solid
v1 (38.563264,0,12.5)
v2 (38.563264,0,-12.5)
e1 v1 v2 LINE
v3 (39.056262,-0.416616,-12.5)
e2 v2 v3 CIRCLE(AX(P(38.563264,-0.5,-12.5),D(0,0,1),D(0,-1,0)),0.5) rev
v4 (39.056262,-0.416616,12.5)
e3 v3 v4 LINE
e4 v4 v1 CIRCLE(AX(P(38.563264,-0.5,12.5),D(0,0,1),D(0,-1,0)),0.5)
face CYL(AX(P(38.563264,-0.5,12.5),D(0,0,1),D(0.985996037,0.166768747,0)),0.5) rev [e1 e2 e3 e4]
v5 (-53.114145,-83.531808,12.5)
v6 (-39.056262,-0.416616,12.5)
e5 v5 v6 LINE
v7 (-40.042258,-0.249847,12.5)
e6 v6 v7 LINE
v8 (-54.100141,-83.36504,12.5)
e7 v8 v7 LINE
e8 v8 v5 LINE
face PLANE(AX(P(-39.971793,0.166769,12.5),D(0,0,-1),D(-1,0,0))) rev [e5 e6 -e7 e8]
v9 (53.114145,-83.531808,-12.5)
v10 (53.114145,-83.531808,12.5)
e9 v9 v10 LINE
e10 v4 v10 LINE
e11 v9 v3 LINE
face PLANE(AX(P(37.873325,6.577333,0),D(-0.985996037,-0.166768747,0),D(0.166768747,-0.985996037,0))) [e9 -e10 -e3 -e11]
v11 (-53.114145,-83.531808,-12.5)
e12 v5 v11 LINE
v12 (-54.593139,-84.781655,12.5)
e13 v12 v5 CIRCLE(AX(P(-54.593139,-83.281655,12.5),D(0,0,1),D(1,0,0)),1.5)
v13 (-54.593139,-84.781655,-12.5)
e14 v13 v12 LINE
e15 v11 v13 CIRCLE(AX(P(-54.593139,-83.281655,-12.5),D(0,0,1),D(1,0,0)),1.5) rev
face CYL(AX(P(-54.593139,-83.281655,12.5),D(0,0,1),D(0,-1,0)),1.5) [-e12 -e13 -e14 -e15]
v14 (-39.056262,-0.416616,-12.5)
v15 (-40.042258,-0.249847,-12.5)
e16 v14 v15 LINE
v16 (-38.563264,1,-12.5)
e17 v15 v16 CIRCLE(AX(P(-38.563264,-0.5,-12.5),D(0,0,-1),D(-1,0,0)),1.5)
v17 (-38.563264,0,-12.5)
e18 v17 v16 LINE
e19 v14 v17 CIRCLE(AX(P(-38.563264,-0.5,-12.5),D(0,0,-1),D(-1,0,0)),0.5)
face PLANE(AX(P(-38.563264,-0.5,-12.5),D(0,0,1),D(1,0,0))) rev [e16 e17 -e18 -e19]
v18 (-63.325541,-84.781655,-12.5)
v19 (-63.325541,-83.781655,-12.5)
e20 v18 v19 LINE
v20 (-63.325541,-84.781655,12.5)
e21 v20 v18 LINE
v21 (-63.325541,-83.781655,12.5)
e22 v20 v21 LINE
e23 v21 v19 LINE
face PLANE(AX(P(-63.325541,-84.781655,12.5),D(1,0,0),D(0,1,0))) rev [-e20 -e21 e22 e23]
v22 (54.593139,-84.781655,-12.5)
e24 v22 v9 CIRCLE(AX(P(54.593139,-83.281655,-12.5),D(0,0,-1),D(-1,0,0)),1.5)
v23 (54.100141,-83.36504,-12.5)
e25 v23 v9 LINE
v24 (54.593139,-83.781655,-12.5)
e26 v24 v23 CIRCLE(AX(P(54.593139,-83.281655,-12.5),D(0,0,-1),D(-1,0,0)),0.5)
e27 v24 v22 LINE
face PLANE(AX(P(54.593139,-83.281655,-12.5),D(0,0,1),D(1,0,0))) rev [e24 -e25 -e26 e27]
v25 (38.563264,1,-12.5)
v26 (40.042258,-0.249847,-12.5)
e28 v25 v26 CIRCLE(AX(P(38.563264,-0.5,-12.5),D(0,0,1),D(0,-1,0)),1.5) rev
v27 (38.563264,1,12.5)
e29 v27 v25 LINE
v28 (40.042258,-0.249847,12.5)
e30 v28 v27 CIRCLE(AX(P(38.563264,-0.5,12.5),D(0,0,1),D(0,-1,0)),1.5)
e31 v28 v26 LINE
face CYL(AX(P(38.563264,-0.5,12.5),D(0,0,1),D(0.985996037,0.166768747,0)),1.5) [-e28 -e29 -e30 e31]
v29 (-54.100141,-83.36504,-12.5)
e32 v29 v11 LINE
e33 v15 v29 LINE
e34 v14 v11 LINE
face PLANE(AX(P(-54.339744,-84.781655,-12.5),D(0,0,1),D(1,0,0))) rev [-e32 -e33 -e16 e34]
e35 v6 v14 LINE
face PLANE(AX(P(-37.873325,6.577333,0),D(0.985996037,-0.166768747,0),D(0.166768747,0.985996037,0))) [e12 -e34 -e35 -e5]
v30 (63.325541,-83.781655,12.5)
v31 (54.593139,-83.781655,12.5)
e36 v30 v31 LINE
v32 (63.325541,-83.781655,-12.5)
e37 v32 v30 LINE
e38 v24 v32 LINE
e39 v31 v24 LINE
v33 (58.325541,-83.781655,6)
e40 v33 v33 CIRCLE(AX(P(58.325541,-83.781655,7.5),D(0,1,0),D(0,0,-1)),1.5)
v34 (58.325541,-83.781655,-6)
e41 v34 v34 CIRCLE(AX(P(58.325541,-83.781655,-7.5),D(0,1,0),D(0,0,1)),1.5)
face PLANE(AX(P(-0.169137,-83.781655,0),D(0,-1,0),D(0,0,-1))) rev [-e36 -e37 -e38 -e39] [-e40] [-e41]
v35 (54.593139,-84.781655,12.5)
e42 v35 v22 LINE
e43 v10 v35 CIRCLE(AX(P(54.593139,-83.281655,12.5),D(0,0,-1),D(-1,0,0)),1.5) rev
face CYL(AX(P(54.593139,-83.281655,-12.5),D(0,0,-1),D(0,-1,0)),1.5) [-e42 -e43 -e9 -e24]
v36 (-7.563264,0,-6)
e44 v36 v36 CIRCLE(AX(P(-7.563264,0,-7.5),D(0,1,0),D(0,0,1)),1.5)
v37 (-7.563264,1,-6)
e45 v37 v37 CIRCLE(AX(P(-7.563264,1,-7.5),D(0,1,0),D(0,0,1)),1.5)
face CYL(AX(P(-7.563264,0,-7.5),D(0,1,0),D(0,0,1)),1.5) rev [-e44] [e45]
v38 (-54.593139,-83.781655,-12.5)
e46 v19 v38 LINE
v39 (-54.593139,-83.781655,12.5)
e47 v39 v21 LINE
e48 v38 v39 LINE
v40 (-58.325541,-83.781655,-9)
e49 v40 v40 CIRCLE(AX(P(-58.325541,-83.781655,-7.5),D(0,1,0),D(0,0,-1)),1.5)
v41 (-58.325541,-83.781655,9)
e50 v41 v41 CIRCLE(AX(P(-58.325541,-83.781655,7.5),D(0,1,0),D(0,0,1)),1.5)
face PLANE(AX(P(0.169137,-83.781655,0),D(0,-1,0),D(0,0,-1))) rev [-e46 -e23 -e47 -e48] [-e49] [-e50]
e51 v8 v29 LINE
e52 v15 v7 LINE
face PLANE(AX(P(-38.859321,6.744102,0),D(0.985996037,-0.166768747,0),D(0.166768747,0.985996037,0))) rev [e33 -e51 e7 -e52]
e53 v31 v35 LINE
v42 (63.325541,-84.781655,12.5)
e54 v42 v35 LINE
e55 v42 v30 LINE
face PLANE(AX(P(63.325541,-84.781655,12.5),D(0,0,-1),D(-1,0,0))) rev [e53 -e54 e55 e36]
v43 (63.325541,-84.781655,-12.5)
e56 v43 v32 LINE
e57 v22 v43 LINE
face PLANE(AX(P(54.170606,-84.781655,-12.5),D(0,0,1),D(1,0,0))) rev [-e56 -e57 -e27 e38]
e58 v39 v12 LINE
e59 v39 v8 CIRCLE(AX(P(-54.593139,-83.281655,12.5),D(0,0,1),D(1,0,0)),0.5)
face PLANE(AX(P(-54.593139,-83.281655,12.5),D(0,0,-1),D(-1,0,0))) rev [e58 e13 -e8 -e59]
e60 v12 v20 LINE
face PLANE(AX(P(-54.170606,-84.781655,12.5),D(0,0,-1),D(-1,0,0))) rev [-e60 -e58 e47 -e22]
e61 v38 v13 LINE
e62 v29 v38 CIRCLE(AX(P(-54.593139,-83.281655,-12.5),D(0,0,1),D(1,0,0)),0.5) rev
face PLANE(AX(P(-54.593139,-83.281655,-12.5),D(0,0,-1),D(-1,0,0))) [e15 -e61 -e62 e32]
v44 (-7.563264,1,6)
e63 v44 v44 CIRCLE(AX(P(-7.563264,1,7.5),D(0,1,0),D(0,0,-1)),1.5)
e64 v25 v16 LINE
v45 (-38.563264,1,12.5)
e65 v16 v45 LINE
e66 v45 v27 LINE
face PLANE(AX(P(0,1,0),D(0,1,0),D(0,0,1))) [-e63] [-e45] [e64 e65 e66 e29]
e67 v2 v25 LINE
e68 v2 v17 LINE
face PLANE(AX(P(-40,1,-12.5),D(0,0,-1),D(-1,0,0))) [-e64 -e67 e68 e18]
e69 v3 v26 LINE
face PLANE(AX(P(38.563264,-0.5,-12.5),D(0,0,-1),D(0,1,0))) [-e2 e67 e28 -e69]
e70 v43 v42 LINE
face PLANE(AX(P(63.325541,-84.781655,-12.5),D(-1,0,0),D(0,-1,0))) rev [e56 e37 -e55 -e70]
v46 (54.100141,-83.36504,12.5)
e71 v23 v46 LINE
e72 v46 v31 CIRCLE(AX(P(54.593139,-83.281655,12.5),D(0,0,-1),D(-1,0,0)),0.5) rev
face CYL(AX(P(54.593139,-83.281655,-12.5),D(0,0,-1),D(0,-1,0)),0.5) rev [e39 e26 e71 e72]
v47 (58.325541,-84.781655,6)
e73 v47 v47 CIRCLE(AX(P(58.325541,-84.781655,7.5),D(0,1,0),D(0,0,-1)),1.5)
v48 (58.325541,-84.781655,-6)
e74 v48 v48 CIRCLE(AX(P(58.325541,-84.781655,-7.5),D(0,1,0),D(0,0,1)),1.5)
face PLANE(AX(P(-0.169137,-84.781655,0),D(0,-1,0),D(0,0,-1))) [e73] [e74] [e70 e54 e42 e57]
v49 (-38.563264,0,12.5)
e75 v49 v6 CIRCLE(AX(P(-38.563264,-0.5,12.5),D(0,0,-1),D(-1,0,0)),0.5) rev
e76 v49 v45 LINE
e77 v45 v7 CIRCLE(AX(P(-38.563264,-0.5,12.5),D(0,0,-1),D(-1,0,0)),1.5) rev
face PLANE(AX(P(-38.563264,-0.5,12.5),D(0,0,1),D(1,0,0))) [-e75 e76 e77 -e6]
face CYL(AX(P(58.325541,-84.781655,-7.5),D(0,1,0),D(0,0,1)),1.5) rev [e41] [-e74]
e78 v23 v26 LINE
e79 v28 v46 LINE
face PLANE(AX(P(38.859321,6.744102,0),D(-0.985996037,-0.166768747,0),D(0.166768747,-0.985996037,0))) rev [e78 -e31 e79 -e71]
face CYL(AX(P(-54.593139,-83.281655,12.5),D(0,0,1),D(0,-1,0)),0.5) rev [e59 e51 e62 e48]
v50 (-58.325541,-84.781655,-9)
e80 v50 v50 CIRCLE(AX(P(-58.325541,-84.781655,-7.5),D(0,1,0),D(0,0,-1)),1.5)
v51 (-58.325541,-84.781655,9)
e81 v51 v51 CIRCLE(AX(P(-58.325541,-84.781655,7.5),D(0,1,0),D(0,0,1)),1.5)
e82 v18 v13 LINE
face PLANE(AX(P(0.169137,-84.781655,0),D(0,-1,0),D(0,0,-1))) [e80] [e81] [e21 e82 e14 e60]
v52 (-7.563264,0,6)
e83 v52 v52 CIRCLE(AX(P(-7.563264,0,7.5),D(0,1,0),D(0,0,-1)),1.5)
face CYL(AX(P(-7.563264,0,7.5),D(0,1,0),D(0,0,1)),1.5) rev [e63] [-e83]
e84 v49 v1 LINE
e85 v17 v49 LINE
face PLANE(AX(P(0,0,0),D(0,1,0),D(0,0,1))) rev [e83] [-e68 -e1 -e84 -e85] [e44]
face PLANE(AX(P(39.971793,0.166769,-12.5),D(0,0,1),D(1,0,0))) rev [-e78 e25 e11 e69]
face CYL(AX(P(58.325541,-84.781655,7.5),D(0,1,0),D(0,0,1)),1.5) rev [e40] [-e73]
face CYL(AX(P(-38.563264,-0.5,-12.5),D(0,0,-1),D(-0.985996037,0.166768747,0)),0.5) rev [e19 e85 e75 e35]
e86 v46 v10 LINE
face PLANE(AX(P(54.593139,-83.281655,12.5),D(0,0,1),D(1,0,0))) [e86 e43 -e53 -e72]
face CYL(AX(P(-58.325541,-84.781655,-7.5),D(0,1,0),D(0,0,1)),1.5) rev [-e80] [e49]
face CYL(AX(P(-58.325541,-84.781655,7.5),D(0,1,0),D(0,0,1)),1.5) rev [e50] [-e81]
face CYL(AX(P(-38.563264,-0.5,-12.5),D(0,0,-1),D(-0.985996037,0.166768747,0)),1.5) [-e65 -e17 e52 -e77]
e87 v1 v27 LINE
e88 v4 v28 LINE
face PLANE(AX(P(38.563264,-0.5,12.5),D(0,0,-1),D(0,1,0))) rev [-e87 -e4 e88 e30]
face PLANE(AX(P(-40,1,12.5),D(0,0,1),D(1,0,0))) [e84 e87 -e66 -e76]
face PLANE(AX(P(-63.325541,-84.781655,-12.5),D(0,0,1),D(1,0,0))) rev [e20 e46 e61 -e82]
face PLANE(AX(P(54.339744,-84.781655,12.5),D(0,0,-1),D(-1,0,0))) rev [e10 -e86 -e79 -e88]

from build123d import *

# Parameters (mm, degrees)
SKETCH_1_W               = 80
SKETCH_1_H               = 25
EXTRUDE_1_DEPTH          = 1
SM_START                 = -12.5
SM_EDGE_FLANGE_1_DEPTH   = 25
SM_EDGE_FLANGE_1_2_DEPTH = 25
SM_EDGE_FLANGE_2_DEPTH   = 25
SM_EDGE_FLANGE_2_2_DEPTH = 25
SKETCH_18_R              = 1.5
CUT_EXTRUDE_1_DEPTH      = 1
SKETCH_19_R              = 1.5
CUT_EXTRUDE_2_DEPTH      = 1


# Read off the part's stored shape, not the designer's step: Ребро-кромка1, Ребро-кромка2
with BuildPart() as part:
    # Sketch 1 → Бобышка-Вытянуть1 (new body)
    with BuildSketch(Plane(origin=(0, 0, 0), x_dir=(1, 0, 0), z_dir=(0, 1, 0))):
        Rectangle(SKETCH_1_W, SKETCH_1_H)
    extrude(amount=EXTRUDE_1_DEPTH)

    # Ребро-кромка1 outline → Ребро-кромка1 (cut)
    with BuildSketch(Plane.XY.offset(SM_START)):
        with BuildLine():
            Line((-40, 0), (-39.977477944, 0))
            ThreePointArc((-39.977477944, 0), (-39.429289785, 0.724744872), (-38.563264381, 1))
            Line((-38.563264381, 1), (-40, 1))
            Line((-40, 1), (-40, 0))
        make_face()
        with BuildLine():
            Line((40, 1), (38.563264381, 1))
            ThreePointArc((38.563264381, 1), (39.429289785, 0.724744872), (39.977477944, 0))
            Line((39.977477944, 0), (40, 0))
            Line((40, 0), (40, 1))
        make_face()
    extrude(amount=SM_EDGE_FLANGE_1_DEPTH, mode=Mode.SUBTRACT)

    # Sm Edge Flange 1 2 outline → Sm Edge Flange 1 2 (add)
    with BuildSketch(Plane.XY.offset(SM_START)):
        with BuildLine():
            ThreePointArc((-39.977477944, 0), (-40.015252138, -0.123527486), (-40.042258437, -0.24984688))
            Line((-40.042258437, -0.24984688), (-54.339743625, -84.781655225))
            Line((-54.339743625, -84.781655225), (-53.353747587, -84.948423972))
            Line((-53.353747587, -84.948423972), (-39.0562624, -0.416615627))
            ThreePointArc((-39.0562624, -0.416615627), (-38.885993225, -0.118101986), (-38.563264381, 0))
            Line((-38.563264381, 0), (-39.977477944, 0))
        make_face()
        with BuildLine():
            Line((39.977477944, 0), (38.563264381, 0))
            ThreePointArc((38.563264381, 0), (38.885993225, -0.118101986), (39.0562624, -0.416615627))
            Line((39.0562624, -0.416615627), (53.353747587, -84.948423972))
            Line((53.353747587, -84.948423972), (54.339743625, -84.781655225))
            Line((54.339743625, -84.781655225), (40.042258437, -0.24984688))
            ThreePointArc((40.042258437, -0.24984688), (40.015252138, -0.123527486), (39.977477944, 0))
        make_face()
    extrude(amount=SM_EDGE_FLANGE_1_2_DEPTH)

    # Ребро-кромка2 outline → Ребро-кромка2 (cut)
    with BuildSketch(Plane.XY.offset(SM_START)):
        with BuildLine():
            Line((54.339743625, -84.781655225), (54.33598765, -84.759448567))
            ThreePointArc((54.33598765, -84.759448567), (53.529971426, -84.339802009), (53.114144989, -83.531808345))
            Line((53.114144989, -83.531808345), (53.353747587, -84.948423972))
            Line((53.353747587, -84.948423972), (54.339743625, -84.781655225))
        make_face()
        with BuildLine():
            ThreePointArc((-53.114144989, -83.531808345), (-53.529971426, -84.339802009), (-54.33598765, -84.759448567))
            Line((-54.33598765, -84.759448567), (-54.339743625, -84.781655225))
            Line((-54.339743625, -84.781655225), (-53.353747587, -84.948423972))
            Line((-53.353747587, -84.948423972), (-53.114144989, -83.531808345))
        make_face()
    extrude(amount=SM_EDGE_FLANGE_2_DEPTH, mode=Mode.SUBTRACT)

    # Sm Edge Flange 2 2 outline → Sm Edge Flange 2 2 (add)
    with BuildSketch(Plane.XY.offset(SM_START)):
        with BuildLine():
            ThreePointArc((54.33598765, -84.759448567), (54.464084816, -84.776093249), (54.593139045, -84.781655225))
            Line((54.593139045, -84.781655225), (63.325540765, -84.781655225))
            Line((63.325540765, -84.781655225), (63.325540765, -83.781655225))
            Line((63.325540765, -83.781655225), (54.593139045, -83.781655225))
            ThreePointArc((54.593139045, -83.781655225), (54.270410201, -83.663553239), (54.100141026, -83.365039598))
            Line((54.100141026, -83.365039598), (54.33598765, -84.759448567))
        make_face()
        with BuildLine():
            Line((-63.325540765, -83.781655225), (-63.325540765, -84.781655225))
            Line((-63.325540765, -84.781655225), (-54.593139045, -84.781655225))
            ThreePointArc((-54.593139045, -84.781655225), (-54.464084816, -84.776093249), (-54.33598765, -84.759448567))
            Line((-54.33598765, -84.759448567), (-54.100141026, -83.365039598))
            ThreePointArc((-54.100141026, -83.365039598), (-54.270410201, -83.663553239), (-54.593139045, -83.781655225))
            Line((-54.593139045, -83.781655225), (-63.325540765, -83.781655225))
        make_face()
    extrude(amount=SM_EDGE_FLANGE_2_2_DEPTH)

    # Эскиз18 → Вырез-Вытянуть1 (cut)
    with BuildSketch(Plane(origin=(0, 1, 0), x_dir=(1, 0, 0), z_dir=(0, 1, 0))):
        with Locations(Location((-7.563264381, 7.5, 0), (0, 0, 270))):
            Circle(SKETCH_18_R)
        with Locations(Location((-7.563264381, -7.5, 0), (0, 0, 90))):
            Circle(SKETCH_18_R)
    extrude(amount=-CUT_EXTRUDE_1_DEPTH, mode=Mode.SUBTRACT)

    # Эскиз19 → Вырез-Вытянуть2 (cut)
    with BuildSketch(Plane(origin=(0, -83.781655225, 0), x_dir=(1, 0, 0), z_dir=(0, 1, 0))):
        with Locations(Location((58.325540765, 7.5, 0), (0, 0, 270))):
            Circle(SKETCH_19_R)
        with Locations(Location((58.325540765, -7.5, 0), (0, 0, 90))):
            Circle(SKETCH_19_R)
        with Locations(Location((-58.325540765, -7.5, 0), (0, 0, 270))):
            Circle(SKETCH_19_R)
        with Locations(Location((-58.325540765, 7.5, 0), (0, 0, 90))):
            Circle(SKETCH_19_R)
    extrude(amount=-CUT_EXTRUDE_2_DEPTH, mode=Mode.SUBTRACT)


solid = part.part
